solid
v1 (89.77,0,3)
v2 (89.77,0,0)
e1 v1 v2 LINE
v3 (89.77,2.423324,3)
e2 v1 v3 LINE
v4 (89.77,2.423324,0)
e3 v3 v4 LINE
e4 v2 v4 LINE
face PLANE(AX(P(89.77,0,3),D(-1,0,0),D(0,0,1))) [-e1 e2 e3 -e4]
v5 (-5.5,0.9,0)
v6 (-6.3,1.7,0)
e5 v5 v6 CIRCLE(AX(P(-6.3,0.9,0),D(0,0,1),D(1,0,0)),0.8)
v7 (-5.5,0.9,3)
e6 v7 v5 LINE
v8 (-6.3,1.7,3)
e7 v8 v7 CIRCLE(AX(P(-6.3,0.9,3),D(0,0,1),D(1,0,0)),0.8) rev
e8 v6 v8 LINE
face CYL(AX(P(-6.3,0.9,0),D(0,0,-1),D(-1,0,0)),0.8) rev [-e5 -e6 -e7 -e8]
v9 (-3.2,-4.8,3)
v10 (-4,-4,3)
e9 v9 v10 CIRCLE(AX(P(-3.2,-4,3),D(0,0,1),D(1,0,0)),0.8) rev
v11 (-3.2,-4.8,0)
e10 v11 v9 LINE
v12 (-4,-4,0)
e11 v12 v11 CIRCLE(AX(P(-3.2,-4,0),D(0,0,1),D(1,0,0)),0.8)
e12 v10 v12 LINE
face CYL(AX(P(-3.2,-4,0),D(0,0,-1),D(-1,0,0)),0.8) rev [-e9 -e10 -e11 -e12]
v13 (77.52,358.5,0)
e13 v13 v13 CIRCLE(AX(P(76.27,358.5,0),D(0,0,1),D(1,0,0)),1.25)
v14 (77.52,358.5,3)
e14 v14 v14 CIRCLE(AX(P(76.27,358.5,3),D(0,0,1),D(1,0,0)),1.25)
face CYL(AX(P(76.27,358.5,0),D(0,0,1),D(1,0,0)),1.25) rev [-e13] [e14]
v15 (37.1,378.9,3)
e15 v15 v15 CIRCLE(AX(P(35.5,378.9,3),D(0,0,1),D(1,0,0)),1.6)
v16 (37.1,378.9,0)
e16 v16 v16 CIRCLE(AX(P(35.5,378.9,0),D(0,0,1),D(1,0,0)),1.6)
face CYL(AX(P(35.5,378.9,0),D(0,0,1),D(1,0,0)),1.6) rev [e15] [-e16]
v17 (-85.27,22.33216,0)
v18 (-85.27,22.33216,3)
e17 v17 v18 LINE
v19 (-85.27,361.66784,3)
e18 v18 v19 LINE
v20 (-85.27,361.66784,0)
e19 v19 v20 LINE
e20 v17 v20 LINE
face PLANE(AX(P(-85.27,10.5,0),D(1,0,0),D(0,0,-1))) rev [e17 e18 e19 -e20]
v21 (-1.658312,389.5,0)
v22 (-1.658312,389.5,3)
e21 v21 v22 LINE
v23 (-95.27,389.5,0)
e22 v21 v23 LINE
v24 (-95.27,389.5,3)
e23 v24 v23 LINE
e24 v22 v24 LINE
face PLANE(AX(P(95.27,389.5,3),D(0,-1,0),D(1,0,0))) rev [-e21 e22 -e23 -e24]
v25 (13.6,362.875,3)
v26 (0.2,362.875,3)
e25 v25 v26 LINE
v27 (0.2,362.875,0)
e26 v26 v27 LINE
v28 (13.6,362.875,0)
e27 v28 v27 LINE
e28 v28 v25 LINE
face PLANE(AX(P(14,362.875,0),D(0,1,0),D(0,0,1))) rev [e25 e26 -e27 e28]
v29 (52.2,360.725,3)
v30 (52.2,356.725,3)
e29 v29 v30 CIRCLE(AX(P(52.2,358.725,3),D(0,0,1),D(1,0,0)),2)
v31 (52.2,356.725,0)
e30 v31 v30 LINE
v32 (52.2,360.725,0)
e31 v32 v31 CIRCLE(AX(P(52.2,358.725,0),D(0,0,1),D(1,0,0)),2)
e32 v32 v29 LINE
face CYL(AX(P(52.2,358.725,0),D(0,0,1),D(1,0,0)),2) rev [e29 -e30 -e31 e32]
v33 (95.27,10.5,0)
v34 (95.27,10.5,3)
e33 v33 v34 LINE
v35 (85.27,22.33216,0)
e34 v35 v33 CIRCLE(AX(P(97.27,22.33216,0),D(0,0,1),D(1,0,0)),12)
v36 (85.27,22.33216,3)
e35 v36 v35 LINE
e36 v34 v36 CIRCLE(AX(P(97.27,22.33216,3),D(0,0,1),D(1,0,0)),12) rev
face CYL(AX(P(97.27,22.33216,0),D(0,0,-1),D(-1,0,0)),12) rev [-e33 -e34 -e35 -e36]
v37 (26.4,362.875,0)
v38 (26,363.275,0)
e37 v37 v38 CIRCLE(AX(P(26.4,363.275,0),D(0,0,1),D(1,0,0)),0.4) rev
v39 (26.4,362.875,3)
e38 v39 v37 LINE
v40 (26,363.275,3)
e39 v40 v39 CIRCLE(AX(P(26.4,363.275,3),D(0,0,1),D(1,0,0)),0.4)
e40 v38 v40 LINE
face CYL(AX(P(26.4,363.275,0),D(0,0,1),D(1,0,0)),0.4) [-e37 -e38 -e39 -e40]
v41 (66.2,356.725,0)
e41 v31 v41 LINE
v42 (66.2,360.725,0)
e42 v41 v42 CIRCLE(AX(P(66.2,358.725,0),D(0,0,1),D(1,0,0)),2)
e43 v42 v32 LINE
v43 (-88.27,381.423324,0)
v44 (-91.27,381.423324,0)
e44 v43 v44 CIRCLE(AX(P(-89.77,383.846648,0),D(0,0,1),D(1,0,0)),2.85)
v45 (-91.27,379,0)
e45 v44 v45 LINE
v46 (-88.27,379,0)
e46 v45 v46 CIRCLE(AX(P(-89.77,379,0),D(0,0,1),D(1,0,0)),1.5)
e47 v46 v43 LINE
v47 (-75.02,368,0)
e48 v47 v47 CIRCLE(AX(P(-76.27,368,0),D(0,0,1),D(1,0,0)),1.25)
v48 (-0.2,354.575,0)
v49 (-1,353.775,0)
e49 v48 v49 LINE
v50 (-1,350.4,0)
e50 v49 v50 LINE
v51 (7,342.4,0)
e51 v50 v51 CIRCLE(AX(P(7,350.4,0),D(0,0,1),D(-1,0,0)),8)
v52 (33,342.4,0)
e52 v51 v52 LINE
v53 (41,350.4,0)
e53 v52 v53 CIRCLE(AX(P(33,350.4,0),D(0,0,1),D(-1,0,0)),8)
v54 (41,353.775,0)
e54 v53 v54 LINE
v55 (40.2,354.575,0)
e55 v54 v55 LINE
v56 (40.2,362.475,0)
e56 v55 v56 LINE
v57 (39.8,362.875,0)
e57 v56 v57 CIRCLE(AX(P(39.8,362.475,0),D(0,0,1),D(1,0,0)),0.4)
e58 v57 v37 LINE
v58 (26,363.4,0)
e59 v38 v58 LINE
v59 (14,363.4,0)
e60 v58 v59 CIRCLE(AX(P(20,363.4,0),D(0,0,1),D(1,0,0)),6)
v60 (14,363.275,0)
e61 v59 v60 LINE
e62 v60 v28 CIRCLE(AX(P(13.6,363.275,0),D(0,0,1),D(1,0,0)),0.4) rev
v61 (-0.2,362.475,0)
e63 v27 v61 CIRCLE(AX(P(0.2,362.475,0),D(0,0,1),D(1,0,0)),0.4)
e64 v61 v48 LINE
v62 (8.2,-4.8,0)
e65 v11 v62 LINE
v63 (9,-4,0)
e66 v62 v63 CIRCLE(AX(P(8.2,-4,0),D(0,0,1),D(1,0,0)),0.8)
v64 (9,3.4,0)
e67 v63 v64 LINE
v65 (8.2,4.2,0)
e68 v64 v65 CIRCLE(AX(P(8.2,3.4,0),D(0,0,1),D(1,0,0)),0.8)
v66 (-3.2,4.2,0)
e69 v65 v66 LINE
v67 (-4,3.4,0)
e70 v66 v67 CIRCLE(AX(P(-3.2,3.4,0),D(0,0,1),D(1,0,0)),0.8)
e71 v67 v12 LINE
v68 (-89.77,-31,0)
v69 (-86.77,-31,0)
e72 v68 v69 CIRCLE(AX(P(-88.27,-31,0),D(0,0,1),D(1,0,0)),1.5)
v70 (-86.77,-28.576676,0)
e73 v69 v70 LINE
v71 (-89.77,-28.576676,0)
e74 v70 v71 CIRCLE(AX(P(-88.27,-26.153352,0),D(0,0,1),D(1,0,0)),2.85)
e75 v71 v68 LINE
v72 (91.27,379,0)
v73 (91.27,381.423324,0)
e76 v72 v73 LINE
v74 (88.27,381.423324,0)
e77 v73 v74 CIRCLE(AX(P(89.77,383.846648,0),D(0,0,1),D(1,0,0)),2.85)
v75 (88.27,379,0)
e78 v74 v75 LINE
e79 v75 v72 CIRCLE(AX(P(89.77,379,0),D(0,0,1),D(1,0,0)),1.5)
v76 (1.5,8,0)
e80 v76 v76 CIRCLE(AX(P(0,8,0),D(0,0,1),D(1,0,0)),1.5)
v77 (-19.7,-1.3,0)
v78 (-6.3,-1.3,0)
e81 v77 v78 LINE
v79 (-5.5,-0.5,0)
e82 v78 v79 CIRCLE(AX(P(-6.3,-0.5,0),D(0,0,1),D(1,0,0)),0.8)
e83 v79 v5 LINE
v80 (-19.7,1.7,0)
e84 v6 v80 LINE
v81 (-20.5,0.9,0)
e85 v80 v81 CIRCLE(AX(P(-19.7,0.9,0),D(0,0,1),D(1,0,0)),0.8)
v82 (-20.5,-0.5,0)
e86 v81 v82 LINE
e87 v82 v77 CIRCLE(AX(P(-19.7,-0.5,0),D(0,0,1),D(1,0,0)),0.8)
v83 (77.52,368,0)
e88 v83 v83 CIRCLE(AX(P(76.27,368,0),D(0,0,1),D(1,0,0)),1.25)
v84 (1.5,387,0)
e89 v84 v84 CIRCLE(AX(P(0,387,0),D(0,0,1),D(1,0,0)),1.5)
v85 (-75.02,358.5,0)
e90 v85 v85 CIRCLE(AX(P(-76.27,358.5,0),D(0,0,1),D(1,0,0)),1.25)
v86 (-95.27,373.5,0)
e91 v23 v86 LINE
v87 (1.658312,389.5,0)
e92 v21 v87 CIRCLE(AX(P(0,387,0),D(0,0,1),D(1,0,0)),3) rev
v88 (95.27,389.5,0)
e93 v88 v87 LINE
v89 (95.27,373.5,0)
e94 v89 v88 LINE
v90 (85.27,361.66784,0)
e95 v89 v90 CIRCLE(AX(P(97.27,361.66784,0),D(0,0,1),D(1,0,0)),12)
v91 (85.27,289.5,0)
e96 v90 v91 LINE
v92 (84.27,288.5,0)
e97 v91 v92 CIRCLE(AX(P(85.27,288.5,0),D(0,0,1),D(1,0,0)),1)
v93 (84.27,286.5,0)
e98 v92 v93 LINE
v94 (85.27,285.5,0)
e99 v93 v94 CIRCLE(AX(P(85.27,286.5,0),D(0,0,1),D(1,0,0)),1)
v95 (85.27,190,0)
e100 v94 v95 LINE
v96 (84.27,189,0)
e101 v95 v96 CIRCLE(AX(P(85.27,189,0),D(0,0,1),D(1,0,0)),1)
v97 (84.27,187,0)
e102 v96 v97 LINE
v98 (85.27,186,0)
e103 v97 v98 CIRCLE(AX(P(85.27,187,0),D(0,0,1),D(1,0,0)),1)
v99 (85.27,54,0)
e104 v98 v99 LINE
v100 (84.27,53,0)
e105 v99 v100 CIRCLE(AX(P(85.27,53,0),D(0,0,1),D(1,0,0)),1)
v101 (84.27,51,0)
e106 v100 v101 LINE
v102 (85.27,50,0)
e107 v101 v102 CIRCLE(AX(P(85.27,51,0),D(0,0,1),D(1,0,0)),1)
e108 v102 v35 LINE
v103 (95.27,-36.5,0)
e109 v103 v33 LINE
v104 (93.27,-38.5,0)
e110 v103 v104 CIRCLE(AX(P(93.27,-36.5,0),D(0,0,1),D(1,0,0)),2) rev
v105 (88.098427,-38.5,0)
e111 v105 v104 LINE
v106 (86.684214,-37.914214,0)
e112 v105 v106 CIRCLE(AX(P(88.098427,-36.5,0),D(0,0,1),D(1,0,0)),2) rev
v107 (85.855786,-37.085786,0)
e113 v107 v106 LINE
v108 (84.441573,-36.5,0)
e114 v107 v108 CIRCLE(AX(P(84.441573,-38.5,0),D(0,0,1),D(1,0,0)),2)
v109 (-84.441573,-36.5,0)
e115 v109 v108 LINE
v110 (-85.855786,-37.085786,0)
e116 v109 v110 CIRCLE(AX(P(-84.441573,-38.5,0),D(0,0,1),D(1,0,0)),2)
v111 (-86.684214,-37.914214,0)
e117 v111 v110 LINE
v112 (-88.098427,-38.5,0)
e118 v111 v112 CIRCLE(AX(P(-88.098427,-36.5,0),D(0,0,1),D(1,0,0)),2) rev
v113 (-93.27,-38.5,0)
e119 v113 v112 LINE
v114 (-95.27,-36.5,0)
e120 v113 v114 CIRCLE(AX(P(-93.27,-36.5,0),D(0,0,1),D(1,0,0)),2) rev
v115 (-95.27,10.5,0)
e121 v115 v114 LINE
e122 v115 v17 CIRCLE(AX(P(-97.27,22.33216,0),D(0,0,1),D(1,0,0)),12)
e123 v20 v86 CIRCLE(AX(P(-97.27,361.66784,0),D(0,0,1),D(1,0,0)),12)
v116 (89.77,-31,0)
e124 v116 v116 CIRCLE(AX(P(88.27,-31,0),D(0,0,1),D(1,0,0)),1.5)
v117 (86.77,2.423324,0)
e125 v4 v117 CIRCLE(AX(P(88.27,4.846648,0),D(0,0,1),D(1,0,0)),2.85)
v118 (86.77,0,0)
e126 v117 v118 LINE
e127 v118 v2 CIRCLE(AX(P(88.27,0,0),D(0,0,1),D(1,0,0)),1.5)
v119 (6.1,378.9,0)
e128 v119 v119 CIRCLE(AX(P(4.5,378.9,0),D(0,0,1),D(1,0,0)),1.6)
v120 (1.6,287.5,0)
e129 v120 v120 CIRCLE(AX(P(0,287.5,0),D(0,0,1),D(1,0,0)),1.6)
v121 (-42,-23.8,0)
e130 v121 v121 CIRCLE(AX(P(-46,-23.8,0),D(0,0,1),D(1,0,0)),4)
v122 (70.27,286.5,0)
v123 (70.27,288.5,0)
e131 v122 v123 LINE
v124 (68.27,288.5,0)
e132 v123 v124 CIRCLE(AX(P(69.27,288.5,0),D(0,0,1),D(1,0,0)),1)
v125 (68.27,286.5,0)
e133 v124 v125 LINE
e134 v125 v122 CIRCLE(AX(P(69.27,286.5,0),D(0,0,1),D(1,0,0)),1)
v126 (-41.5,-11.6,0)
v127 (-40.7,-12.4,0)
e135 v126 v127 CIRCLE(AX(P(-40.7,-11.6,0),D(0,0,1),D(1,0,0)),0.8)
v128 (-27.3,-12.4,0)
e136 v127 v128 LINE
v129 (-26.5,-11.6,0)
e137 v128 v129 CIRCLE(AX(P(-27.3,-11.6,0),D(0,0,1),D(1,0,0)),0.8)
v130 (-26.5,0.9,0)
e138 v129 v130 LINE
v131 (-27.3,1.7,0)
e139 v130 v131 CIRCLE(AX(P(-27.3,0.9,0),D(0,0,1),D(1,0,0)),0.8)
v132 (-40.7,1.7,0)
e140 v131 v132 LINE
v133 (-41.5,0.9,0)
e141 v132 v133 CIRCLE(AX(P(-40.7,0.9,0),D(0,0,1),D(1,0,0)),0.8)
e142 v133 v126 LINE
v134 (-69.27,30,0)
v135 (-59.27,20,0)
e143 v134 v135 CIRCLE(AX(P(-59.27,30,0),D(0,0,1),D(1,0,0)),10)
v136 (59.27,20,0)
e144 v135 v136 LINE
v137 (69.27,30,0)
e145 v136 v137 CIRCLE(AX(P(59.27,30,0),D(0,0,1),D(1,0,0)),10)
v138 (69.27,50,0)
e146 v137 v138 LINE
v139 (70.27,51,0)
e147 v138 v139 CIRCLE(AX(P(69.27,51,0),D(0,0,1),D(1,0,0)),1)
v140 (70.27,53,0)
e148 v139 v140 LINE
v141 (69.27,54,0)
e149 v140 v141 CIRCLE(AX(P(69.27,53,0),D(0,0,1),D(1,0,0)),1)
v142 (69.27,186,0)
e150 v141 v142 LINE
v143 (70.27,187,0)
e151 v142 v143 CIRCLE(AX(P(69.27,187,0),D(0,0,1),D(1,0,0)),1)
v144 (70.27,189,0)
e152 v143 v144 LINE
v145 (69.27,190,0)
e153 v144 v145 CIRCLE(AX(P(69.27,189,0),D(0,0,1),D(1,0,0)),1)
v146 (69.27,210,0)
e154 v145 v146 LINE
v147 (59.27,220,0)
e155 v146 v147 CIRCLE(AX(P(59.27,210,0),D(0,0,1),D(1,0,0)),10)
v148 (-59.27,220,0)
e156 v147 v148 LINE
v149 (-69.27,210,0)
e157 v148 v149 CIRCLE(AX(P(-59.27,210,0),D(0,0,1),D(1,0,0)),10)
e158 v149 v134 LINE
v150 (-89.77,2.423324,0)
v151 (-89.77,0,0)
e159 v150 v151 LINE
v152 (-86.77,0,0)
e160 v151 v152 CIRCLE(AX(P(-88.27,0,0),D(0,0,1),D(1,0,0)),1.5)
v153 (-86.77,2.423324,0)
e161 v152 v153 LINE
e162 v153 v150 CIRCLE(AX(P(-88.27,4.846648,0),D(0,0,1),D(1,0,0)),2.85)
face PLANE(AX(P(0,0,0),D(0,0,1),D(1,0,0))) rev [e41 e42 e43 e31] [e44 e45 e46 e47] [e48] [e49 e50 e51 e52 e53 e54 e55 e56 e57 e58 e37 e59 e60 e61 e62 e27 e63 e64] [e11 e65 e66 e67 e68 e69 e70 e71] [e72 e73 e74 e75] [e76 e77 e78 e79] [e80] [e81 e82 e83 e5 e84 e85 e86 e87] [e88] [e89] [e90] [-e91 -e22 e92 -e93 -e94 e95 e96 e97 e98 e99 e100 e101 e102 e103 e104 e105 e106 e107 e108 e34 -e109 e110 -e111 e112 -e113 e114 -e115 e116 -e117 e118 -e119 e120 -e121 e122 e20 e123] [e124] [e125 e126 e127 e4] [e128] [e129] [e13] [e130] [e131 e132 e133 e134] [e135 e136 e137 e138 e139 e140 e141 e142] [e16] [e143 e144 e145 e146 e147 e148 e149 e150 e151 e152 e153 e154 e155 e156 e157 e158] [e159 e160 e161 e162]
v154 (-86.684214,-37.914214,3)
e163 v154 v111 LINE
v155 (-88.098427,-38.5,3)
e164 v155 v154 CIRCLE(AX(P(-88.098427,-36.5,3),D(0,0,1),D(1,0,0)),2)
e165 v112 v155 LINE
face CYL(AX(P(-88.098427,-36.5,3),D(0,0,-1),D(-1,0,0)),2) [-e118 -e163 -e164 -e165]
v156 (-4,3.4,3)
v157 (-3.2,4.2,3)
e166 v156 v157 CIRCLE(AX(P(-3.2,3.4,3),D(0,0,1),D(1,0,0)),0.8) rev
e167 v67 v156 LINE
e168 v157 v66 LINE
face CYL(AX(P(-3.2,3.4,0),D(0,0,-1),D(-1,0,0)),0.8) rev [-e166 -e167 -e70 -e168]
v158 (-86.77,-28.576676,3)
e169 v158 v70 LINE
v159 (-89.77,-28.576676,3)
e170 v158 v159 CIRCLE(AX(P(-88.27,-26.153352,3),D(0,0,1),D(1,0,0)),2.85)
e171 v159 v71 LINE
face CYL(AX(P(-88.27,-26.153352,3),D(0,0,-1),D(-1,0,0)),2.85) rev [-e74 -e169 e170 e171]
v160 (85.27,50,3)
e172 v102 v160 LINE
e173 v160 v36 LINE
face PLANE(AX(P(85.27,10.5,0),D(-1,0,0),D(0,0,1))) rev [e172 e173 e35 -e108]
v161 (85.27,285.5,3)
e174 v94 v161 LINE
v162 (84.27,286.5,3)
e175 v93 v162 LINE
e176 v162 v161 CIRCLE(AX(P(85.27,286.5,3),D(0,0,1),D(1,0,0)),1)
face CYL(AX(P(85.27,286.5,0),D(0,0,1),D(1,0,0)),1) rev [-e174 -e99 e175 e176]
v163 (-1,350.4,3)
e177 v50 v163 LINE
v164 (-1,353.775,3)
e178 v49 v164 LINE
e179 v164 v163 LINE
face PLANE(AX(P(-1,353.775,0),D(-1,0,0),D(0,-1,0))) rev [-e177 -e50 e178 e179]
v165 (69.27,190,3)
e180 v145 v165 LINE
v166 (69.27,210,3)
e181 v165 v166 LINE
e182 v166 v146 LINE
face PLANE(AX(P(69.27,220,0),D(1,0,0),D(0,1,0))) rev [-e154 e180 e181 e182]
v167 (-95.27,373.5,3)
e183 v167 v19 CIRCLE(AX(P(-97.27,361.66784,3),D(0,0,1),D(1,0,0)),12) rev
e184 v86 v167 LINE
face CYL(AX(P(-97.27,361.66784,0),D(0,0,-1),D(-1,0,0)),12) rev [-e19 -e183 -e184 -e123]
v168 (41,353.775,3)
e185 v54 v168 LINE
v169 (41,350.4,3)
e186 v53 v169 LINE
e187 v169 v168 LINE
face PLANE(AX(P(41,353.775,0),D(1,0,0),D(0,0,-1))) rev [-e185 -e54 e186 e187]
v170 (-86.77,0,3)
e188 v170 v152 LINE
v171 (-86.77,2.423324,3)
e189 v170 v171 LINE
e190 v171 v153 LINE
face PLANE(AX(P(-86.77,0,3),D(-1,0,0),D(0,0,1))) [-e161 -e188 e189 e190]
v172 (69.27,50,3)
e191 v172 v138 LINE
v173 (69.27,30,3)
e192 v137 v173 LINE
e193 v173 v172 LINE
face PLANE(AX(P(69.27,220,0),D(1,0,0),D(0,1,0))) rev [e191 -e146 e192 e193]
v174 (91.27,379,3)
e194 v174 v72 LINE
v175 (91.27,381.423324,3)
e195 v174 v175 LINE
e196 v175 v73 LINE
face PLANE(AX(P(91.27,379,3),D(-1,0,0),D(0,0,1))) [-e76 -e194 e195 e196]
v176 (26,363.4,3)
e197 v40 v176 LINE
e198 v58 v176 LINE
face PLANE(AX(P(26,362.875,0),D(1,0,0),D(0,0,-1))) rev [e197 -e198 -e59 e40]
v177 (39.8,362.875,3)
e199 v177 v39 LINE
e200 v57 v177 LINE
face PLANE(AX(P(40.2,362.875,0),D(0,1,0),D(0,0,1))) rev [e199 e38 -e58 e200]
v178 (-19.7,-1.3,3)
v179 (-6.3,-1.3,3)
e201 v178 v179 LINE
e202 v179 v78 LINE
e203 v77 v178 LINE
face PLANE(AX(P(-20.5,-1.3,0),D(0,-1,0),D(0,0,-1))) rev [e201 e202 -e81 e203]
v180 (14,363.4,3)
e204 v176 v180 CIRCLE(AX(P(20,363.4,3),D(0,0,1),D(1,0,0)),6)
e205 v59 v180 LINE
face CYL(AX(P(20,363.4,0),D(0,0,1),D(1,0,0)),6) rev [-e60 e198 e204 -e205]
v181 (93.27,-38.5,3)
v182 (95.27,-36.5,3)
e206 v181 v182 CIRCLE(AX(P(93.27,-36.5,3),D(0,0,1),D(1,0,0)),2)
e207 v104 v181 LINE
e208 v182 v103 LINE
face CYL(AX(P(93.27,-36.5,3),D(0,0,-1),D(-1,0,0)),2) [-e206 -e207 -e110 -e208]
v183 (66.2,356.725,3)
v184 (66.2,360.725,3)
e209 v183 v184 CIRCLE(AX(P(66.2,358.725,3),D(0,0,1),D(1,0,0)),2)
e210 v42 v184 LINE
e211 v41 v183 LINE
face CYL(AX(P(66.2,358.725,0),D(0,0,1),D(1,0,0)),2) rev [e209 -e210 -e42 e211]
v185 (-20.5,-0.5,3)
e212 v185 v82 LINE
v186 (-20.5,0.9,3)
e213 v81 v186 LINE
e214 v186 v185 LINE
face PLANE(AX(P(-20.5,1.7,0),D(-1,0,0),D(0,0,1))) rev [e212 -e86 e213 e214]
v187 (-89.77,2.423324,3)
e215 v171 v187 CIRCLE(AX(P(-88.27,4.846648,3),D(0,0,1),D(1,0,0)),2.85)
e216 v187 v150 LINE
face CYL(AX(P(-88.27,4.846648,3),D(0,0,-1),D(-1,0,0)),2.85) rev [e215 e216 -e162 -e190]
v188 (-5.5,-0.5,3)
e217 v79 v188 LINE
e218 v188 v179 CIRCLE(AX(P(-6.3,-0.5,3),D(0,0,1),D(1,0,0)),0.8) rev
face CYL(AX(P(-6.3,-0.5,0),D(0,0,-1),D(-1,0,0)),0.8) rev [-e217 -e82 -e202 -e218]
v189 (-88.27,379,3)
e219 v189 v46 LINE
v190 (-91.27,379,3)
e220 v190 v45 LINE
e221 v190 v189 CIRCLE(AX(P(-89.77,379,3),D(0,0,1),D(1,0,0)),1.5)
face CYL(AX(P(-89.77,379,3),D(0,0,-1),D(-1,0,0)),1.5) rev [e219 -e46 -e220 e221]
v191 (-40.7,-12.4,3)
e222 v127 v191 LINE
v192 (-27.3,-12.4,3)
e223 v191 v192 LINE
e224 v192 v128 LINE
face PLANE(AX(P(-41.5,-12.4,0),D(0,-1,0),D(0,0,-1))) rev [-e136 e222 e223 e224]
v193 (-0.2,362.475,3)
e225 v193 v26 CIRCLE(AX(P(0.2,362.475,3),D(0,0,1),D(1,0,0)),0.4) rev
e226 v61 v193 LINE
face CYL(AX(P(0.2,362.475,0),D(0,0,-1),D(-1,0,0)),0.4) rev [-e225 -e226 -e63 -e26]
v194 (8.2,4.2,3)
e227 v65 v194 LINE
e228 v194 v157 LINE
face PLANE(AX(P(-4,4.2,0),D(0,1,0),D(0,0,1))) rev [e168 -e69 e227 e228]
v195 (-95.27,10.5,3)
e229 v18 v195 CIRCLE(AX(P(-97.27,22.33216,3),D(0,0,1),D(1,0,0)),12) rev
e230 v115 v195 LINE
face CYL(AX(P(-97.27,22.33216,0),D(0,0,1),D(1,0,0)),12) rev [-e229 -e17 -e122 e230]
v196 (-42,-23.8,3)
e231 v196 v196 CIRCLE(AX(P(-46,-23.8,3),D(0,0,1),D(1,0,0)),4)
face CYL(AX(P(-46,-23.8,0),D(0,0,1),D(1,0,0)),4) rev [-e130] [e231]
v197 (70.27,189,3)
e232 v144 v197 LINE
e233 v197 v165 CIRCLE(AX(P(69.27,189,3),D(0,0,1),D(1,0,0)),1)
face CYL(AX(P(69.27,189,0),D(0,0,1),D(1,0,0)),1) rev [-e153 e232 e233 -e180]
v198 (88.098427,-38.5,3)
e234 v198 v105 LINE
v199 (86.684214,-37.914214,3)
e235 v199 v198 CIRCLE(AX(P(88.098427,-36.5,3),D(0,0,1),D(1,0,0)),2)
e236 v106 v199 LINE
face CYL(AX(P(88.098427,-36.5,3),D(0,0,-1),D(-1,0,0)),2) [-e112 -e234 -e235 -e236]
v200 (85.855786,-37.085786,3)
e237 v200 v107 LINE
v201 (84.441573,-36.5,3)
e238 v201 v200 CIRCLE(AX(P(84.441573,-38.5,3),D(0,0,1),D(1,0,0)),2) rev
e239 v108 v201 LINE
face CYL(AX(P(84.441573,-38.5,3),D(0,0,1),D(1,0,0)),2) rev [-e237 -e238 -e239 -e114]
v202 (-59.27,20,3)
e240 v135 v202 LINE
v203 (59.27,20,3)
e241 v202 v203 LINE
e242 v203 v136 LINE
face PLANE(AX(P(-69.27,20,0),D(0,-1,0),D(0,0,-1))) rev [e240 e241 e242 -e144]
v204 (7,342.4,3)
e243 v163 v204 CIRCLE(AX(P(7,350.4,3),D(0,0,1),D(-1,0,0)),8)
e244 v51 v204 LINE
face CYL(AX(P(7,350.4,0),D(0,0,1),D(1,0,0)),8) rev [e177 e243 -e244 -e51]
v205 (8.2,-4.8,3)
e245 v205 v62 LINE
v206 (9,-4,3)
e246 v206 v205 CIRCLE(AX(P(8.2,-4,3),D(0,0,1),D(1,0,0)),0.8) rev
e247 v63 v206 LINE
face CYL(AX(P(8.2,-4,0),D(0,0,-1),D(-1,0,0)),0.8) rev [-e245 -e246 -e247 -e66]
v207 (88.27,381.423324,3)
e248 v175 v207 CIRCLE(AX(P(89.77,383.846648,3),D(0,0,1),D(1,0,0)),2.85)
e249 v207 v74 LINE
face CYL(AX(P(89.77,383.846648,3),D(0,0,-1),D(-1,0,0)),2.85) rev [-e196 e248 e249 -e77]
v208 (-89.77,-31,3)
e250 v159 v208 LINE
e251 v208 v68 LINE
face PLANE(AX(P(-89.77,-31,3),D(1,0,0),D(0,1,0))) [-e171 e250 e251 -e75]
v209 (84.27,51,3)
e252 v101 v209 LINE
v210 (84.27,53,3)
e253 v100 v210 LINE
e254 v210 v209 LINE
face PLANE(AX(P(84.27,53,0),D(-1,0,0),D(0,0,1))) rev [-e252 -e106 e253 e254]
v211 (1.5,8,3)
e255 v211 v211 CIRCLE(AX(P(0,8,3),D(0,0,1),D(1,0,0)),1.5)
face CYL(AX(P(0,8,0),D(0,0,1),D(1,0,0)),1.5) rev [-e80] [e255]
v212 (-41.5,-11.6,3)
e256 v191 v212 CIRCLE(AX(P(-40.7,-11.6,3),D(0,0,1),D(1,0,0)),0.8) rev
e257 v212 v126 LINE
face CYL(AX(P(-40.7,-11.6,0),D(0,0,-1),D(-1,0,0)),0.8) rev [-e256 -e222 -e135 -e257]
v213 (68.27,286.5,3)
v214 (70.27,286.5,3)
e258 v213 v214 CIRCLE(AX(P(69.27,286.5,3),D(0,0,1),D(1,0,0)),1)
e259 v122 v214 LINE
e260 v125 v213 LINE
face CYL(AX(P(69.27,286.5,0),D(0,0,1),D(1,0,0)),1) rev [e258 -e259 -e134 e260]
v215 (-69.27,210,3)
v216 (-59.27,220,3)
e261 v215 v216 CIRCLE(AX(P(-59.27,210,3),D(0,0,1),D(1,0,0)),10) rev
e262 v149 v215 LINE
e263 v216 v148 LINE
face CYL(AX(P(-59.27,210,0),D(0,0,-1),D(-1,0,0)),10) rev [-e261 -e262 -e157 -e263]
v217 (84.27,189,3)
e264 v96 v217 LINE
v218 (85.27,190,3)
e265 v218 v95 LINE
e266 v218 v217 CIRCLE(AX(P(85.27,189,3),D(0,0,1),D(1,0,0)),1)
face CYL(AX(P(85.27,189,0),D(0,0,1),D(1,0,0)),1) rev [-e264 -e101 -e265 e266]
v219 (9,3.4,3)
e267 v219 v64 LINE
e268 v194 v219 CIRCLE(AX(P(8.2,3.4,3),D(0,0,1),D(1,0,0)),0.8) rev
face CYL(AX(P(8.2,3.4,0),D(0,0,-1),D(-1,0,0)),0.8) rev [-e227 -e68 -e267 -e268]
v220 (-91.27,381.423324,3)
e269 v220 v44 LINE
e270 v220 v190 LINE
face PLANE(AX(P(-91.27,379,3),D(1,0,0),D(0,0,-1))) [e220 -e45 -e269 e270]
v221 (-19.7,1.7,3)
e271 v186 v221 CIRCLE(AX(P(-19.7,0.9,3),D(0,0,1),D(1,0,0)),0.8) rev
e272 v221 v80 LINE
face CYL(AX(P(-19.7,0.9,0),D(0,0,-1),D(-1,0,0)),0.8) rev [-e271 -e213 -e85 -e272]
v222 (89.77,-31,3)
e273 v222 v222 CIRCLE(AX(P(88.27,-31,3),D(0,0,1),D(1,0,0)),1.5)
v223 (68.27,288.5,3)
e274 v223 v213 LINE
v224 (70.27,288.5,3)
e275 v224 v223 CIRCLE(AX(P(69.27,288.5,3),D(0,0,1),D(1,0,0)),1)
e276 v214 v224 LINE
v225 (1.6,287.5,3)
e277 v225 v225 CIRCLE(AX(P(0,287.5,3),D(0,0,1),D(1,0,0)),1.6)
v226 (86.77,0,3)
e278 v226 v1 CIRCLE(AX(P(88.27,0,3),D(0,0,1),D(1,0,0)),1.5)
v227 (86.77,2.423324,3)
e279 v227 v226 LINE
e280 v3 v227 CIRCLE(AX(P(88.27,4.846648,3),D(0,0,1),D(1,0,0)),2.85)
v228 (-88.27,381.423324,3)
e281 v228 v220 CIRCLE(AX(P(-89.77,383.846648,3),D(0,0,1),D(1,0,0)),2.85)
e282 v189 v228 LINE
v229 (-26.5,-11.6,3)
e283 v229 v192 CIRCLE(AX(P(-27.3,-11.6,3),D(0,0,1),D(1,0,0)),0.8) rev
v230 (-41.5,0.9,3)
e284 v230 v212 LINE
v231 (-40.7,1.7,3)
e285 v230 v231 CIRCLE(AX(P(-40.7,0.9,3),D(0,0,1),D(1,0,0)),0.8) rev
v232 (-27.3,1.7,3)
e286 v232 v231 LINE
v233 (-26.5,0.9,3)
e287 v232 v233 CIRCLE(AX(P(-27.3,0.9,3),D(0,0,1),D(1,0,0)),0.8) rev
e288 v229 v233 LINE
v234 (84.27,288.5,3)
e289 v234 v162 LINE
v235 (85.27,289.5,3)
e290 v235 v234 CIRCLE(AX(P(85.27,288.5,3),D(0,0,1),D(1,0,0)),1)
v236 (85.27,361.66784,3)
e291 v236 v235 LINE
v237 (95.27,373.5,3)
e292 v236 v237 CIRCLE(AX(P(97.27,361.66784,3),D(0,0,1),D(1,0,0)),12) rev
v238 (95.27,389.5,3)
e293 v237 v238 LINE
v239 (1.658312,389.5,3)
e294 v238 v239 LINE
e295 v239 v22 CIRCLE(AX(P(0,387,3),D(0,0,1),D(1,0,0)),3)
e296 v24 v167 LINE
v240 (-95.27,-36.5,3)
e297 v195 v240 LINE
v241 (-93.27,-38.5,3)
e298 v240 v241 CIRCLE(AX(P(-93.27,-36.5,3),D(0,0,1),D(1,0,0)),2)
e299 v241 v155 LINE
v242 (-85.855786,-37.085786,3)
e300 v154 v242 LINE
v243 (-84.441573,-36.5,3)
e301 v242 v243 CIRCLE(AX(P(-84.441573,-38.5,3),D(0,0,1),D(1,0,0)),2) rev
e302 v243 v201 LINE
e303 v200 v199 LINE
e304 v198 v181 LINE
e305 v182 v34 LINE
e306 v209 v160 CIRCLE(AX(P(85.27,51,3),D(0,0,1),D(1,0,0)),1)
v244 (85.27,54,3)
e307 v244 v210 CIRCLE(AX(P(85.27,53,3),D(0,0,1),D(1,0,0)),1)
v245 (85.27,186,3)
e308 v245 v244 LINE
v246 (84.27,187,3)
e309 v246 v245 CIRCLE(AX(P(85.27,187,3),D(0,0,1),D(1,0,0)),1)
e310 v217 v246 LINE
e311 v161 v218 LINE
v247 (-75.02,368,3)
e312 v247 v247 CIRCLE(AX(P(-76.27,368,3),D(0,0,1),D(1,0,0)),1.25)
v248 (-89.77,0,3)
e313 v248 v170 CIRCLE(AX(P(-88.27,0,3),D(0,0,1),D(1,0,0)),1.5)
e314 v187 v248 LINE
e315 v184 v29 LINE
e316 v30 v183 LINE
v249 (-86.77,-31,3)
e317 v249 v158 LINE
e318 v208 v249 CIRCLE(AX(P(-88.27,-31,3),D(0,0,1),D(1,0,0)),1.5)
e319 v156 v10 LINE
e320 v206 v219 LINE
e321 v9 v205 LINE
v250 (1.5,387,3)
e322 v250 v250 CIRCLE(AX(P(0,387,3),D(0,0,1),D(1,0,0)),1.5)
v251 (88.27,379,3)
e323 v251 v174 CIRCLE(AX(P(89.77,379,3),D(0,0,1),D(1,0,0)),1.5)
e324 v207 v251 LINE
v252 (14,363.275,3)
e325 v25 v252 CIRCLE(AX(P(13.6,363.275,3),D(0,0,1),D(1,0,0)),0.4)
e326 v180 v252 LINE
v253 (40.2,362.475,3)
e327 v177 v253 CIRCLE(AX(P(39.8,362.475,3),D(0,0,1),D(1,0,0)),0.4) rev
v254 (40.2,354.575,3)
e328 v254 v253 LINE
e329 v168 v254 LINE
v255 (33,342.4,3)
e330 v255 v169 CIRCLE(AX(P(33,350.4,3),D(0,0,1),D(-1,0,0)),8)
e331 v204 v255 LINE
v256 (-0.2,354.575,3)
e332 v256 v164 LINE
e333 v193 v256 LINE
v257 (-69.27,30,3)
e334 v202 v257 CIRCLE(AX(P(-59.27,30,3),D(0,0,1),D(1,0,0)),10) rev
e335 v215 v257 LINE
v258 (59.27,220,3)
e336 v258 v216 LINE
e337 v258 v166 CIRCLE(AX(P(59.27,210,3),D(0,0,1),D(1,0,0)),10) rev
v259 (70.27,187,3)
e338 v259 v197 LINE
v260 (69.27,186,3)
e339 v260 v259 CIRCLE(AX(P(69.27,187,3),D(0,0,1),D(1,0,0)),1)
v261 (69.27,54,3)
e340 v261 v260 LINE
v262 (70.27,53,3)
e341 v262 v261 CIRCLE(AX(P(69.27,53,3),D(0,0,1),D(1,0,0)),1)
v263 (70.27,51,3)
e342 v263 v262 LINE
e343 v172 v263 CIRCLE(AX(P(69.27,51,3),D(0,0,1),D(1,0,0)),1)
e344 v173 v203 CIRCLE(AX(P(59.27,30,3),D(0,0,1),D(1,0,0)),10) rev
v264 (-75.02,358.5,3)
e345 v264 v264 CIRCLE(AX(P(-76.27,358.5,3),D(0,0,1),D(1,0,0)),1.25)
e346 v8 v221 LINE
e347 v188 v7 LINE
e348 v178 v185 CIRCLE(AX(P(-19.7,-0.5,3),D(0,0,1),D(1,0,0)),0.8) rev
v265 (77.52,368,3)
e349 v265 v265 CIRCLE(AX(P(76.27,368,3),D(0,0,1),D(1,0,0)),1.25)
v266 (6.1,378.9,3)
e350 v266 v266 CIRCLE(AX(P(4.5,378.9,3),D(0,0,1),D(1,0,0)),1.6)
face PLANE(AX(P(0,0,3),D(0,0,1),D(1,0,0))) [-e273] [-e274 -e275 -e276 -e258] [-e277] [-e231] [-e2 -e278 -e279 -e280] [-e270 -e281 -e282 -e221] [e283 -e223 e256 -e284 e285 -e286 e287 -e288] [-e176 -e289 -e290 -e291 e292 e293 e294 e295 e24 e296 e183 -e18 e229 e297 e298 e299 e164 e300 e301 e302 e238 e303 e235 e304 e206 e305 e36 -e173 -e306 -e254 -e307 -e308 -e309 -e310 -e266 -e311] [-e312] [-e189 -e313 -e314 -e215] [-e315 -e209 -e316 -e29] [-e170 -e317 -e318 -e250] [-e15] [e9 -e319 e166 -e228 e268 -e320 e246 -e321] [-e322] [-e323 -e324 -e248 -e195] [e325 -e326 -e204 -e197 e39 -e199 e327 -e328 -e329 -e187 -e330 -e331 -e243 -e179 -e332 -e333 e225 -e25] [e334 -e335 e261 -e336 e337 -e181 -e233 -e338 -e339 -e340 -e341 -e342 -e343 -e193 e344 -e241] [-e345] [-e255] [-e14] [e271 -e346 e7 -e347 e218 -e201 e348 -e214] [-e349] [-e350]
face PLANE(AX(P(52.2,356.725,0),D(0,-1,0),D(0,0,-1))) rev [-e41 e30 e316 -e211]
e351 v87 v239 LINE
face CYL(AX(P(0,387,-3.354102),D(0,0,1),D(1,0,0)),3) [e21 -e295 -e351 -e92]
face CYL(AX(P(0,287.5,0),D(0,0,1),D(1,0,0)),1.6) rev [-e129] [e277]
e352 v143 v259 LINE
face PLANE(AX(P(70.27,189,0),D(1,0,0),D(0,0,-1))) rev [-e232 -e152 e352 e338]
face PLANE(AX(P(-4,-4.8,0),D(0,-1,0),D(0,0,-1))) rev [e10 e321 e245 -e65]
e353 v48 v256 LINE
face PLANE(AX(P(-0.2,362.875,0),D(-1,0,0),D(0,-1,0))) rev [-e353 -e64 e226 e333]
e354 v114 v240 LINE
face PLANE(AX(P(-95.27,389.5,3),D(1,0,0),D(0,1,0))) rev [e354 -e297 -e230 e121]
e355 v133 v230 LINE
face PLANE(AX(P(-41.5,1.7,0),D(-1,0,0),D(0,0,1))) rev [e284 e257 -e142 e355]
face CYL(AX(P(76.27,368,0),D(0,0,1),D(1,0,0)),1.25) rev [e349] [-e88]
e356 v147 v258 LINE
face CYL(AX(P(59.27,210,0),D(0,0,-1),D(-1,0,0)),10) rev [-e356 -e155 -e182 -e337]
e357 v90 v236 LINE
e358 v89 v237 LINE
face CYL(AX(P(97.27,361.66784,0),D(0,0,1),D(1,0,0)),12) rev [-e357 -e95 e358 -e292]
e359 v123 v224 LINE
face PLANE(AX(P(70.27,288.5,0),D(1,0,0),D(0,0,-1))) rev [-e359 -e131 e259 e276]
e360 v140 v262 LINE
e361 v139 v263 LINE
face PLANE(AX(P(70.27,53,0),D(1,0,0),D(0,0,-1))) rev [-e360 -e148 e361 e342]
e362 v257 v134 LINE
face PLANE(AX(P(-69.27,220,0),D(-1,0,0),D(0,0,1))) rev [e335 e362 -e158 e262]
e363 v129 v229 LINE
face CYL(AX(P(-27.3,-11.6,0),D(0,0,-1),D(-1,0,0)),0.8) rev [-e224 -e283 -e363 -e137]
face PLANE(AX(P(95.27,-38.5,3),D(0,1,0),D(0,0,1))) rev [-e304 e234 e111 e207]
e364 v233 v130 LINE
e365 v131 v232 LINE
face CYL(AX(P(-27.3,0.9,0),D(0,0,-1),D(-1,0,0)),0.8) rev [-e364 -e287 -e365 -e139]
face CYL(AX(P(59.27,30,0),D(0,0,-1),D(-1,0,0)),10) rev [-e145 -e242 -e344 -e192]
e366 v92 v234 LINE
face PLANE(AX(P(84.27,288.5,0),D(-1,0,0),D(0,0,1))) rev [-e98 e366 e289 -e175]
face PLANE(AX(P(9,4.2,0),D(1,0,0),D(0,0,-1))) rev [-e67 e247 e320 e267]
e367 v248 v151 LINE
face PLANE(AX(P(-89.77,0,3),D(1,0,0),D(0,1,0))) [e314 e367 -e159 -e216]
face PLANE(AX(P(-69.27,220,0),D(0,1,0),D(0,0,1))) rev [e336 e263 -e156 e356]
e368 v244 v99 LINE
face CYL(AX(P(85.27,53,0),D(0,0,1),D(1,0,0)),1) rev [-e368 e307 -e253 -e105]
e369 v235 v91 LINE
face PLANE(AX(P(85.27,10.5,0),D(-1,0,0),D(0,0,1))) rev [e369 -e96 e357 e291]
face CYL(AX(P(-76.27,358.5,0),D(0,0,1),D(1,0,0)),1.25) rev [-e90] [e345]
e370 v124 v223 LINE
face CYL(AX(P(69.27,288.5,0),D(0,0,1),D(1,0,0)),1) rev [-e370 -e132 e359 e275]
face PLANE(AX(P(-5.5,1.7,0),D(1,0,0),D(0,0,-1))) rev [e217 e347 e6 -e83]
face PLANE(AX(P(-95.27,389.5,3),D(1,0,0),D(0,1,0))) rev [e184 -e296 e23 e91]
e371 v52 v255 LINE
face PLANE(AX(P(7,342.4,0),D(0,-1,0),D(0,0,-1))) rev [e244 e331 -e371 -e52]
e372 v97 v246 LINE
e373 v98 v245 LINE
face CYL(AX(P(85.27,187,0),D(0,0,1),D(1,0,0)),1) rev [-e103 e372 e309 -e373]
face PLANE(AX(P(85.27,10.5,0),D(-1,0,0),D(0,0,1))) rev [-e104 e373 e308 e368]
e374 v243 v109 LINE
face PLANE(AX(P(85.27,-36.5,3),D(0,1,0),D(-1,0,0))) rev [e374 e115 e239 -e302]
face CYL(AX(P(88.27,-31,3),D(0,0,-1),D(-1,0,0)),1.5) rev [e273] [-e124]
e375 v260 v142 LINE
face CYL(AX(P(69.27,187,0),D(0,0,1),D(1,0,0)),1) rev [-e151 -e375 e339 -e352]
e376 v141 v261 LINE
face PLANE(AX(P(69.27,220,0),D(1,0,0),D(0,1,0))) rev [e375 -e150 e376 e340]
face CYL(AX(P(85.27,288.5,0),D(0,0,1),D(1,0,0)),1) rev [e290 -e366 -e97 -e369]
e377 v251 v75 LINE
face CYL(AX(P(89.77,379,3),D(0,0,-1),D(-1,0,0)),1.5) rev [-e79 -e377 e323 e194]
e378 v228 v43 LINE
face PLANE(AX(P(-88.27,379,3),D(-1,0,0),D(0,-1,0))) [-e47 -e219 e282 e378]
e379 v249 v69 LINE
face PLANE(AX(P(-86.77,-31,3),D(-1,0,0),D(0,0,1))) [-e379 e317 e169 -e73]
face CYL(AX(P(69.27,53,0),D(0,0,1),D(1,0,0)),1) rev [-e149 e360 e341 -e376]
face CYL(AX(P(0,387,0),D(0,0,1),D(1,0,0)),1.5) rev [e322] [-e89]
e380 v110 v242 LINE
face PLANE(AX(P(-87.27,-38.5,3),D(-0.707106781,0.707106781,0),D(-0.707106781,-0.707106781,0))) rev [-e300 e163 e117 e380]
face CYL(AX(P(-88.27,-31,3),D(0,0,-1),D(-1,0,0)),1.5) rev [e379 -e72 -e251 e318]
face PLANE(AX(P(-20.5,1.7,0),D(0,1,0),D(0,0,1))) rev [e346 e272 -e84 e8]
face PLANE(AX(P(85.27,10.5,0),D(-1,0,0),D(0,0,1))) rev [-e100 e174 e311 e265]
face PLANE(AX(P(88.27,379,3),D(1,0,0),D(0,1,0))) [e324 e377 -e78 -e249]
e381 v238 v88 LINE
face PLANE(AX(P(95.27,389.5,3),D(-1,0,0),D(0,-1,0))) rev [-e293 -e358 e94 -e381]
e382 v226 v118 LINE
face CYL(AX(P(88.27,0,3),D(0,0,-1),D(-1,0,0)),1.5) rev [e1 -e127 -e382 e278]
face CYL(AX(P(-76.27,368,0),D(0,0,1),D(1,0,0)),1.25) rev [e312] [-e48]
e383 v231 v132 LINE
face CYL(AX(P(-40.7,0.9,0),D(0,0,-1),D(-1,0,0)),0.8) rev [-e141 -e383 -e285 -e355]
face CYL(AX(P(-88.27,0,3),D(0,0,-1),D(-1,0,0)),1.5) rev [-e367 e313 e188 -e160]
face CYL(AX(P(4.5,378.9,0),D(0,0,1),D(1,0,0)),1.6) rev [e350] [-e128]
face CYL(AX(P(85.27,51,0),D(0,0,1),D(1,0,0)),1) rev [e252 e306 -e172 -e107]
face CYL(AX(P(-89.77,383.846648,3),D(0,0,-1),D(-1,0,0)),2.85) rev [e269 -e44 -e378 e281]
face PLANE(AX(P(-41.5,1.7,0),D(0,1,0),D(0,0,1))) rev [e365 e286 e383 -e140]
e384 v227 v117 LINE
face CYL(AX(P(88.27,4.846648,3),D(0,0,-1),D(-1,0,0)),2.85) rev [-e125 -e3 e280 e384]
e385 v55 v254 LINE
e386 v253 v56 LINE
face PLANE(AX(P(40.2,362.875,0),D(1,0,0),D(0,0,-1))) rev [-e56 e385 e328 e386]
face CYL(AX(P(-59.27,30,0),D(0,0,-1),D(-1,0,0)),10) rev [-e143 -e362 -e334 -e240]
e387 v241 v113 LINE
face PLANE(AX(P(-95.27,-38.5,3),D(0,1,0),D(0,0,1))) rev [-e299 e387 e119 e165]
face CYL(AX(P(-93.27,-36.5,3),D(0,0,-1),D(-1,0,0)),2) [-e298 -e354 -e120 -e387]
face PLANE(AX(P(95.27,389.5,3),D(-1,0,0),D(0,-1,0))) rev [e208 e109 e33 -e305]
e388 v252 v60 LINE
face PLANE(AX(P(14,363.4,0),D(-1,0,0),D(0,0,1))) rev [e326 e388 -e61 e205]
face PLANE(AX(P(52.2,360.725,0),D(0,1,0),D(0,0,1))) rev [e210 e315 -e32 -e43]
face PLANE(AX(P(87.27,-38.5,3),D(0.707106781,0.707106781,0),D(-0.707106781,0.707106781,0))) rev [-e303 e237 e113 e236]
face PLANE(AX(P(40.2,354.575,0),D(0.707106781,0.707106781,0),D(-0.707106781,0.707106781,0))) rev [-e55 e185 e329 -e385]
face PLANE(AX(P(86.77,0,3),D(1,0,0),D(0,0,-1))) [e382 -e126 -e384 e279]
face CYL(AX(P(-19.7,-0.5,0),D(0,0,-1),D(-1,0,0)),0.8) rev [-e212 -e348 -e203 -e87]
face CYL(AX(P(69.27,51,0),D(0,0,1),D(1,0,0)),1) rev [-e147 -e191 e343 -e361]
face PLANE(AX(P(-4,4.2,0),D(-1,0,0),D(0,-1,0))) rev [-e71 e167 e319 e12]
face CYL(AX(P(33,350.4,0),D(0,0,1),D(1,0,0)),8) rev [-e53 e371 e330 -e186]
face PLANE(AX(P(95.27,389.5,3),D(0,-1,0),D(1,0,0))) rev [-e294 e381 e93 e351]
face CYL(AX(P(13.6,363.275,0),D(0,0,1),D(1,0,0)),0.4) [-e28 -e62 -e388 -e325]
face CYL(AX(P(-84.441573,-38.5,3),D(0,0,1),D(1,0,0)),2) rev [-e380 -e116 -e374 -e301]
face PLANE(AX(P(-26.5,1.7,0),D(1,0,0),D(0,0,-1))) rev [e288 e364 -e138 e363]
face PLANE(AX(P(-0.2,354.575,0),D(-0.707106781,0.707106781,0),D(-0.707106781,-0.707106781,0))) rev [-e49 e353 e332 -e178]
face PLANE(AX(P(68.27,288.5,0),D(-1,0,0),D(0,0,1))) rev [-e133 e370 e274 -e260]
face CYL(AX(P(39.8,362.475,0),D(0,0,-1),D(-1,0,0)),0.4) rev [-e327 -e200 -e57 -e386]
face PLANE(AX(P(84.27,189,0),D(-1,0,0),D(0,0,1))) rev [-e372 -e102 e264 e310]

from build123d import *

# Parameters (mm, degrees)
SKETCH1_R           = 1.5
BOSS_EXTRUDE1_DEPTH = 3
SKETCH2_W           = 10
SKETCH2_H           = 363
CUT_EXTRUDE1_DEPTH  = 401.99329533
FILLET1_R           = 12
SKETCH3_R           = 1.5
CUT_EXTRUDE2_DEPTH  = 401.99329533
SKETCH4_W           = 138.54
SKETCH4_H           = 200
CUT_EXTRUDE3_DEPTH  = 401.99329533
FILLET2_R           = 10
SKETCH5_W           = 15
SKETCH5_H           = 14.1
SKETCH5_H_2         = 3
SKETCH5_W_2         = 13
SKETCH5_H_3         = 9
CUT_EXTRUDE4_DEPTH  = 401.99329533
FILLET3_R           = 0.8
SKETCH6_R           = 4
CUT_EXTRUDE5_DEPTH  = 401.99329533
SKETCH8_R           = 1.6
CUT_EXTRUDE7_DEPTH  = 401.99329533
FILLET4_R           = 0.4
BOSS_EXTRUDE2_DEPTH = 3
SKETCH10_R          = 1.25
CUT_EXTRUDE8_DEPTH  = 402.478981891
CUT_EXTRUDE9_DEPTH  = 402.478981891
FILLET5_R           = 2


with BuildPart() as part:
    # Sketch1 → Boss-Extrude1 (new body)
    with BuildSketch(Plane.XY):
        Polygon((95.27, 389.5), (-95.27, 389.5), (-95.27, -36.5), (-95.27, -38.5), (-87.27, -38.5), (-85.27, -36.5), (85.27, -36.5), (87.27, -38.5), (95.27, -38.5), (95.27, -36.5), align=None)
        with Locations((88.27, -31)):
            Circle(SKETCH1_R, mode=Mode.SUBTRACT)
        with BuildLine():
            Line((-89.77, -31), (-89.77, -28.576675837))
            ThreePointArc((-89.77, -28.576675837), (-88.27, -23.303351674), (-86.77, -28.576675837))
            Line((-86.77, -28.576675837), (-86.77, -31))
            ThreePointArc((-86.77, -31), (-88.27, -32.5), (-89.77, -31))
        make_face(mode=Mode.SUBTRACT)
        with BuildLine():
            Line((-89.77, 0), (-89.77, 2.423324163))
            ThreePointArc((-89.77, 2.423324163), (-88.27, 7.696648326), (-86.77, 2.423324163))
            Line((-86.77, 2.423324163), (-86.77, 0))
            ThreePointArc((-86.77, 0), (-88.27, -1.5), (-89.77, 0))
        make_face(mode=Mode.SUBTRACT)
        with BuildLine():
            Line((86.77, 0), (86.77, 2.423324163))
            ThreePointArc((86.77, 2.423324163), (88.27, 7.696648326), (89.77, 2.423324163))
            Line((89.77, 2.423324163), (89.77, 0))
            ThreePointArc((89.77, 0), (88.27, -1.5), (86.77, 0))
        make_face(mode=Mode.SUBTRACT)
        with BuildLine():
            Line((88.27, 379), (88.27, 381.423324163))
            ThreePointArc((88.27, 381.423324163), (89.77, 386.696648326), (91.27, 381.423324163))
            Line((91.27, 381.423324163), (91.27, 379))
            ThreePointArc((91.27, 379), (89.77, 377.5), (88.27, 379))
        make_face(mode=Mode.SUBTRACT)
        with BuildLine():
            Line((-91.27, 379), (-91.27, 381.423324163))
            ThreePointArc((-91.27, 381.423324163), (-89.77, 386.696648326), (-88.27, 381.423324163))
            Line((-88.27, 381.423324163), (-88.27, 379))
            ThreePointArc((-88.27, 379), (-89.77, 377.5), (-91.27, 379))
        make_face(mode=Mode.SUBTRACT)
    extrude(amount=BOSS_EXTRUDE1_DEPTH)

    # Sketch2 → Cut-Extrude1 (cut, through all)
    with BuildSketch(Plane.XY.offset(3)):
        with Locations((-90.27, 192)):
            Rectangle(SKETCH2_W, SKETCH2_H)
        with Locations((90.27, 192)):
            Rectangle(SKETCH2_W, SKETCH2_H)
    extrude(amount=-CUT_EXTRUDE1_DEPTH, mode=Mode.SUBTRACT)

    # Fillet1
    # the kernel refuses this fillet: 12 mm, written as the material it adds along each edge
    with BuildSketch(Plane(origin=(85.27, 10.5, 3), x_dir=(0, 1, 0), z_dir=(0, 0, -1))) as fillet1_piece_1:
        with BuildLine():
            CenterArc((11.832159566, 12), FILLET1_R, 189.594068227, 80.405931773)
            Line((0, 10), (-0.236643191, 9.96))
            ThreePointArc((-0.236643191, 9.96), (-0.24, 5), (-0.24, 0))
            Line((-0.24, 0), (0, -0.24))
            Line((0, -0.24), (11.832159566, -0.24))
            Line((11.832159566, -0.24), (11.832159566, 0))
        make_face()
    extrude(amount=3)
    with BuildSketch(Plane(origin=(-85.27, 10.5, 3), x_dir=(-1, 0, 0), z_dir=(0, 0, -1)), Plane(origin=(85.27, 373.5, 3), x_dir=(1, 0, 0), z_dir=(0, 0, -1))) as fillet1_piece_2:
        with BuildLine():
            CenterArc((12, 11.832159566), FILLET1_R, 180, 80.405931773)
            Line((0, 11.832159566), (-0.24, 11.832159566))
            Line((-0.24, 11.832159566), (-0.24, 0))
            Line((-0.24, 0), (0, -0.24))
            ThreePointArc((0, -0.24), (5, -0.24), (9.96, -0.236643191))
            Line((9.96, -0.236643191), (10, 0))
        make_face()
    extrude(amount=3)
    with BuildSketch(Plane(origin=(-85.27, 373.5, 3), x_dir=(-1, 0, 0), z_dir=(0, 0, -1))) as fillet1_piece_3:
        with BuildLine():
            CenterArc((12, -11.832159566), FILLET1_R, 99.594068227, 80.405931773)
            Line((0, -11.832159566), (-0.24, -11.832159566))
            Line((-0.24, -11.832159566), (-0.24, 0))
            Line((-0.24, 0), (0, 0.24))
            ThreePointArc((0, 0.24), (5, 0.24), (9.96, 0.236643191))
            Line((9.96, 0.236643191), (10, 0))
        make_face()
    extrude(amount=3)

    # Sketch3 → Cut-Extrude2 (cut, through all)
    with BuildSketch(Plane.XY.offset(3)):
        with Locations((0, 8)):
            Circle(SKETCH3_R)
        with Locations((0, 387)):
            Circle(SKETCH3_R)
    extrude(amount=-CUT_EXTRUDE2_DEPTH, mode=Mode.SUBTRACT)

    # Sketch4 → Cut-Extrude3 (cut, through all)
    with BuildSketch(Plane.XY.offset(3)):
        with Locations((0, 120)):
            Rectangle(SKETCH4_W, SKETCH4_H)
    extrude(amount=-CUT_EXTRUDE3_DEPTH, mode=Mode.SUBTRACT)

    # Fillet2
    fillet2_edges = [part.edges().sort_by_distance(p)[0] for p in [
        (69.27, 220, 1.5),
        (69.27, 20, 1.5),
        (-69.27, 20, 1.5),
        (-69.27, 220, 1.5),
    ]]
    fillet(fillet2_edges, radius=FILLET2_R)

    # Sketch5 → Cut-Extrude4 (cut, through all)
    with BuildSketch(Plane.XY.offset(3)):
        with Locations((-34, -5.35)):
            Rectangle(SKETCH5_W, SKETCH5_H)
        with Locations((-13, 0.2)):
            Rectangle(SKETCH5_W, SKETCH5_H_2)
        with Locations((2.5, -0.3)):
            Rectangle(SKETCH5_W_2, SKETCH5_H_3)
    extrude(amount=-CUT_EXTRUDE4_DEPTH, mode=Mode.SUBTRACT)

    # Fillet3
    fillet3_edges = [part.edges().sort_by_distance(p)[0] for p in [
        (-41.5, -12.4, 1.5),
        (-41.5, 1.7, 1.5),
        (-26.5, 1.7, 1.5),
        (-26.5, -12.4, 1.5),
        (-20.5, -1.3, 1.5),
        (-20.5, 1.7, 1.5),
        (-5.5, 1.7, 1.5),
        (-5.5, -1.3, 1.5),
        (-4, -4.8, 1.5),
        (-4, 4.2, 1.5),
        (9, 4.2, 1.5),
        (9, -4.8, 1.5),
    ]]
    fillet(fillet3_edges, radius=FILLET3_R)

    # Sketch6 → Cut-Extrude5 (cut, through all)
    with BuildSketch(Plane.XY.offset(3)):
        with Locations((-46, -23.8)):
            Circle(SKETCH6_R)
    extrude(amount=-CUT_EXTRUDE5_DEPTH, mode=Mode.SUBTRACT)

    # Sketch8 → Cut-Extrude7 (cut, through all)
    with BuildSketch(Plane.XY.offset(3)):
        with Locations((4.5, 378.9)):
            Circle(SKETCH8_R)
        with Locations((35.5, 378.9)):
            Circle(SKETCH8_R)
        with Locations((0, 287.5)):
            Circle(SKETCH8_R)
        with BuildLine():
            Line((7, 342.4), (33, 342.4))
            ThreePointArc((33, 342.4), (38.656854249, 344.743145751), (41, 350.4))
            Line((41, 350.4), (41, 353.775))
            Line((41, 353.775), (40.2, 354.575))
            Line((40.2, 354.575), (40.2, 362.875))
            Line((40.2, 362.875), (26, 362.875))
            Line((26, 362.875), (26, 363.4))
            ThreePointArc((26, 363.4), (20, 369.4), (14, 363.4))
            Line((14, 363.4), (14, 362.875))
            Line((14, 362.875), (-0.2, 362.875))
            Line((-0.2, 362.875), (-0.2, 354.575))
            Line((-0.2, 354.575), (-1, 353.775))
            Line((-1, 353.775), (-1, 350.4))
            ThreePointArc((-1, 350.4), (1.343145751, 344.743145751), (7, 342.4))
        make_face()
        with BuildLine():
            Line((52.2, 360.725), (66.2, 360.725))
            ThreePointArc((66.2, 360.725), (68.2, 358.725), (66.2, 356.725))
            Line((66.2, 356.725), (52.2, 356.725))
            ThreePointArc((52.2, 356.725), (50.2, 358.725), (52.2, 360.725))
        make_face()
    extrude(amount=-CUT_EXTRUDE7_DEPTH, mode=Mode.SUBTRACT)

    # Fillet4
    fillet4_edges = [part.edges().sort_by_distance(p)[0] for p in [
        (-0.2, 362.875, 1.5),
        (14, 362.875, 1.5),
        (26, 362.875, 1.5),
        (40.2, 362.875, 1.5),
    ]]
    fillet(fillet4_edges, radius=FILLET4_R)

    # Sketch9 → Boss-Extrude2 (add)
    with BuildSketch(Plane.XY.offset(3)):
        with BuildLine():
            Line((-1.658312395, 389.5), (1.658312395, 389.5))
            ThreePointArc((1.658312395, 389.5), (0, 390), (-1.658312395, 389.5))
        make_face()
    extrude(amount=-BOSS_EXTRUDE2_DEPTH)

    # Sketch10 → Cut-Extrude8 (cut, through all)
    with BuildSketch(Plane.XY.offset(3)):
        with Locations((-76.27, 368)):
            Circle(SKETCH10_R)
        with Locations((-76.27, 358.5)):
            Circle(SKETCH10_R)
        with Locations((76.27, 368)):
            Circle(SKETCH10_R)
        with Locations((76.27, 358.5)):
            Circle(SKETCH10_R)
    extrude(amount=-CUT_EXTRUDE8_DEPTH, mode=Mode.SUBTRACT)

    # Sketch11 → Cut-Extrude9 (cut, through all)
    with BuildSketch(Plane.XY.offset(3)):
        with BuildLine():
            Line((86.27, 189), (86.27, 187))
            ThreePointArc((86.27, 187), (85.27, 186), (84.27, 187))
            Line((84.27, 187), (84.27, 189))
            ThreePointArc((84.27, 189), (85.27, 190), (86.27, 189))
        make_face()
        with BuildLine():
            Line((70.27, 189), (70.27, 187))
            ThreePointArc((70.27, 187), (69.27, 186), (68.27, 187))
            Line((68.27, 187), (68.27, 189))
            ThreePointArc((68.27, 189), (69.27, 190), (70.27, 189))
        make_face()
        with BuildLine():
            Line((86.27, 288.5), (86.27, 286.5))
            ThreePointArc((86.27, 286.5), (85.27, 285.5), (84.27, 286.5))
            Line((84.27, 286.5), (84.27, 288.5))
            ThreePointArc((84.27, 288.5), (85.27, 289.5), (86.27, 288.5))
        make_face()
        with BuildLine():
            Line((70.27, 288.5), (70.27, 286.5))
            ThreePointArc((70.27, 286.5), (69.27, 285.5), (68.27, 286.5))
            Line((68.27, 286.5), (68.27, 288.5))
            ThreePointArc((68.27, 288.5), (69.27, 289.5), (70.27, 288.5))
        make_face()
        with BuildLine():
            Line((86.27, 53), (86.27, 51))
            ThreePointArc((86.27, 51), (85.27, 50), (84.27, 51))
            Line((84.27, 51), (84.27, 53))
            ThreePointArc((84.27, 53), (85.27, 54), (86.27, 53))
        make_face()
        with BuildLine():
            Line((70.27, 53), (70.27, 51))
            ThreePointArc((70.27, 51), (69.27, 50), (68.27, 51))
            Line((68.27, 51), (68.27, 53))
            ThreePointArc((68.27, 53), (69.27, 54), (70.27, 53))
        make_face()
    extrude(amount=-CUT_EXTRUDE9_DEPTH, mode=Mode.SUBTRACT)

    # Fillet5
    fillet5_edges = [part.edges().sort_by_distance(p)[0] for p in [
        (95.27, -38.5, 1.5),
        (87.27, -38.5, 1.5),
        (85.27, -36.5, 1.5),
        (-85.27, -36.5, 1.5),
        (-87.27, -38.5, 1.5),
        (-95.27, -38.5, 1.5),
    ]]
    fillet(fillet5_edges, radius=FILLET5_R)


solid = part.part
